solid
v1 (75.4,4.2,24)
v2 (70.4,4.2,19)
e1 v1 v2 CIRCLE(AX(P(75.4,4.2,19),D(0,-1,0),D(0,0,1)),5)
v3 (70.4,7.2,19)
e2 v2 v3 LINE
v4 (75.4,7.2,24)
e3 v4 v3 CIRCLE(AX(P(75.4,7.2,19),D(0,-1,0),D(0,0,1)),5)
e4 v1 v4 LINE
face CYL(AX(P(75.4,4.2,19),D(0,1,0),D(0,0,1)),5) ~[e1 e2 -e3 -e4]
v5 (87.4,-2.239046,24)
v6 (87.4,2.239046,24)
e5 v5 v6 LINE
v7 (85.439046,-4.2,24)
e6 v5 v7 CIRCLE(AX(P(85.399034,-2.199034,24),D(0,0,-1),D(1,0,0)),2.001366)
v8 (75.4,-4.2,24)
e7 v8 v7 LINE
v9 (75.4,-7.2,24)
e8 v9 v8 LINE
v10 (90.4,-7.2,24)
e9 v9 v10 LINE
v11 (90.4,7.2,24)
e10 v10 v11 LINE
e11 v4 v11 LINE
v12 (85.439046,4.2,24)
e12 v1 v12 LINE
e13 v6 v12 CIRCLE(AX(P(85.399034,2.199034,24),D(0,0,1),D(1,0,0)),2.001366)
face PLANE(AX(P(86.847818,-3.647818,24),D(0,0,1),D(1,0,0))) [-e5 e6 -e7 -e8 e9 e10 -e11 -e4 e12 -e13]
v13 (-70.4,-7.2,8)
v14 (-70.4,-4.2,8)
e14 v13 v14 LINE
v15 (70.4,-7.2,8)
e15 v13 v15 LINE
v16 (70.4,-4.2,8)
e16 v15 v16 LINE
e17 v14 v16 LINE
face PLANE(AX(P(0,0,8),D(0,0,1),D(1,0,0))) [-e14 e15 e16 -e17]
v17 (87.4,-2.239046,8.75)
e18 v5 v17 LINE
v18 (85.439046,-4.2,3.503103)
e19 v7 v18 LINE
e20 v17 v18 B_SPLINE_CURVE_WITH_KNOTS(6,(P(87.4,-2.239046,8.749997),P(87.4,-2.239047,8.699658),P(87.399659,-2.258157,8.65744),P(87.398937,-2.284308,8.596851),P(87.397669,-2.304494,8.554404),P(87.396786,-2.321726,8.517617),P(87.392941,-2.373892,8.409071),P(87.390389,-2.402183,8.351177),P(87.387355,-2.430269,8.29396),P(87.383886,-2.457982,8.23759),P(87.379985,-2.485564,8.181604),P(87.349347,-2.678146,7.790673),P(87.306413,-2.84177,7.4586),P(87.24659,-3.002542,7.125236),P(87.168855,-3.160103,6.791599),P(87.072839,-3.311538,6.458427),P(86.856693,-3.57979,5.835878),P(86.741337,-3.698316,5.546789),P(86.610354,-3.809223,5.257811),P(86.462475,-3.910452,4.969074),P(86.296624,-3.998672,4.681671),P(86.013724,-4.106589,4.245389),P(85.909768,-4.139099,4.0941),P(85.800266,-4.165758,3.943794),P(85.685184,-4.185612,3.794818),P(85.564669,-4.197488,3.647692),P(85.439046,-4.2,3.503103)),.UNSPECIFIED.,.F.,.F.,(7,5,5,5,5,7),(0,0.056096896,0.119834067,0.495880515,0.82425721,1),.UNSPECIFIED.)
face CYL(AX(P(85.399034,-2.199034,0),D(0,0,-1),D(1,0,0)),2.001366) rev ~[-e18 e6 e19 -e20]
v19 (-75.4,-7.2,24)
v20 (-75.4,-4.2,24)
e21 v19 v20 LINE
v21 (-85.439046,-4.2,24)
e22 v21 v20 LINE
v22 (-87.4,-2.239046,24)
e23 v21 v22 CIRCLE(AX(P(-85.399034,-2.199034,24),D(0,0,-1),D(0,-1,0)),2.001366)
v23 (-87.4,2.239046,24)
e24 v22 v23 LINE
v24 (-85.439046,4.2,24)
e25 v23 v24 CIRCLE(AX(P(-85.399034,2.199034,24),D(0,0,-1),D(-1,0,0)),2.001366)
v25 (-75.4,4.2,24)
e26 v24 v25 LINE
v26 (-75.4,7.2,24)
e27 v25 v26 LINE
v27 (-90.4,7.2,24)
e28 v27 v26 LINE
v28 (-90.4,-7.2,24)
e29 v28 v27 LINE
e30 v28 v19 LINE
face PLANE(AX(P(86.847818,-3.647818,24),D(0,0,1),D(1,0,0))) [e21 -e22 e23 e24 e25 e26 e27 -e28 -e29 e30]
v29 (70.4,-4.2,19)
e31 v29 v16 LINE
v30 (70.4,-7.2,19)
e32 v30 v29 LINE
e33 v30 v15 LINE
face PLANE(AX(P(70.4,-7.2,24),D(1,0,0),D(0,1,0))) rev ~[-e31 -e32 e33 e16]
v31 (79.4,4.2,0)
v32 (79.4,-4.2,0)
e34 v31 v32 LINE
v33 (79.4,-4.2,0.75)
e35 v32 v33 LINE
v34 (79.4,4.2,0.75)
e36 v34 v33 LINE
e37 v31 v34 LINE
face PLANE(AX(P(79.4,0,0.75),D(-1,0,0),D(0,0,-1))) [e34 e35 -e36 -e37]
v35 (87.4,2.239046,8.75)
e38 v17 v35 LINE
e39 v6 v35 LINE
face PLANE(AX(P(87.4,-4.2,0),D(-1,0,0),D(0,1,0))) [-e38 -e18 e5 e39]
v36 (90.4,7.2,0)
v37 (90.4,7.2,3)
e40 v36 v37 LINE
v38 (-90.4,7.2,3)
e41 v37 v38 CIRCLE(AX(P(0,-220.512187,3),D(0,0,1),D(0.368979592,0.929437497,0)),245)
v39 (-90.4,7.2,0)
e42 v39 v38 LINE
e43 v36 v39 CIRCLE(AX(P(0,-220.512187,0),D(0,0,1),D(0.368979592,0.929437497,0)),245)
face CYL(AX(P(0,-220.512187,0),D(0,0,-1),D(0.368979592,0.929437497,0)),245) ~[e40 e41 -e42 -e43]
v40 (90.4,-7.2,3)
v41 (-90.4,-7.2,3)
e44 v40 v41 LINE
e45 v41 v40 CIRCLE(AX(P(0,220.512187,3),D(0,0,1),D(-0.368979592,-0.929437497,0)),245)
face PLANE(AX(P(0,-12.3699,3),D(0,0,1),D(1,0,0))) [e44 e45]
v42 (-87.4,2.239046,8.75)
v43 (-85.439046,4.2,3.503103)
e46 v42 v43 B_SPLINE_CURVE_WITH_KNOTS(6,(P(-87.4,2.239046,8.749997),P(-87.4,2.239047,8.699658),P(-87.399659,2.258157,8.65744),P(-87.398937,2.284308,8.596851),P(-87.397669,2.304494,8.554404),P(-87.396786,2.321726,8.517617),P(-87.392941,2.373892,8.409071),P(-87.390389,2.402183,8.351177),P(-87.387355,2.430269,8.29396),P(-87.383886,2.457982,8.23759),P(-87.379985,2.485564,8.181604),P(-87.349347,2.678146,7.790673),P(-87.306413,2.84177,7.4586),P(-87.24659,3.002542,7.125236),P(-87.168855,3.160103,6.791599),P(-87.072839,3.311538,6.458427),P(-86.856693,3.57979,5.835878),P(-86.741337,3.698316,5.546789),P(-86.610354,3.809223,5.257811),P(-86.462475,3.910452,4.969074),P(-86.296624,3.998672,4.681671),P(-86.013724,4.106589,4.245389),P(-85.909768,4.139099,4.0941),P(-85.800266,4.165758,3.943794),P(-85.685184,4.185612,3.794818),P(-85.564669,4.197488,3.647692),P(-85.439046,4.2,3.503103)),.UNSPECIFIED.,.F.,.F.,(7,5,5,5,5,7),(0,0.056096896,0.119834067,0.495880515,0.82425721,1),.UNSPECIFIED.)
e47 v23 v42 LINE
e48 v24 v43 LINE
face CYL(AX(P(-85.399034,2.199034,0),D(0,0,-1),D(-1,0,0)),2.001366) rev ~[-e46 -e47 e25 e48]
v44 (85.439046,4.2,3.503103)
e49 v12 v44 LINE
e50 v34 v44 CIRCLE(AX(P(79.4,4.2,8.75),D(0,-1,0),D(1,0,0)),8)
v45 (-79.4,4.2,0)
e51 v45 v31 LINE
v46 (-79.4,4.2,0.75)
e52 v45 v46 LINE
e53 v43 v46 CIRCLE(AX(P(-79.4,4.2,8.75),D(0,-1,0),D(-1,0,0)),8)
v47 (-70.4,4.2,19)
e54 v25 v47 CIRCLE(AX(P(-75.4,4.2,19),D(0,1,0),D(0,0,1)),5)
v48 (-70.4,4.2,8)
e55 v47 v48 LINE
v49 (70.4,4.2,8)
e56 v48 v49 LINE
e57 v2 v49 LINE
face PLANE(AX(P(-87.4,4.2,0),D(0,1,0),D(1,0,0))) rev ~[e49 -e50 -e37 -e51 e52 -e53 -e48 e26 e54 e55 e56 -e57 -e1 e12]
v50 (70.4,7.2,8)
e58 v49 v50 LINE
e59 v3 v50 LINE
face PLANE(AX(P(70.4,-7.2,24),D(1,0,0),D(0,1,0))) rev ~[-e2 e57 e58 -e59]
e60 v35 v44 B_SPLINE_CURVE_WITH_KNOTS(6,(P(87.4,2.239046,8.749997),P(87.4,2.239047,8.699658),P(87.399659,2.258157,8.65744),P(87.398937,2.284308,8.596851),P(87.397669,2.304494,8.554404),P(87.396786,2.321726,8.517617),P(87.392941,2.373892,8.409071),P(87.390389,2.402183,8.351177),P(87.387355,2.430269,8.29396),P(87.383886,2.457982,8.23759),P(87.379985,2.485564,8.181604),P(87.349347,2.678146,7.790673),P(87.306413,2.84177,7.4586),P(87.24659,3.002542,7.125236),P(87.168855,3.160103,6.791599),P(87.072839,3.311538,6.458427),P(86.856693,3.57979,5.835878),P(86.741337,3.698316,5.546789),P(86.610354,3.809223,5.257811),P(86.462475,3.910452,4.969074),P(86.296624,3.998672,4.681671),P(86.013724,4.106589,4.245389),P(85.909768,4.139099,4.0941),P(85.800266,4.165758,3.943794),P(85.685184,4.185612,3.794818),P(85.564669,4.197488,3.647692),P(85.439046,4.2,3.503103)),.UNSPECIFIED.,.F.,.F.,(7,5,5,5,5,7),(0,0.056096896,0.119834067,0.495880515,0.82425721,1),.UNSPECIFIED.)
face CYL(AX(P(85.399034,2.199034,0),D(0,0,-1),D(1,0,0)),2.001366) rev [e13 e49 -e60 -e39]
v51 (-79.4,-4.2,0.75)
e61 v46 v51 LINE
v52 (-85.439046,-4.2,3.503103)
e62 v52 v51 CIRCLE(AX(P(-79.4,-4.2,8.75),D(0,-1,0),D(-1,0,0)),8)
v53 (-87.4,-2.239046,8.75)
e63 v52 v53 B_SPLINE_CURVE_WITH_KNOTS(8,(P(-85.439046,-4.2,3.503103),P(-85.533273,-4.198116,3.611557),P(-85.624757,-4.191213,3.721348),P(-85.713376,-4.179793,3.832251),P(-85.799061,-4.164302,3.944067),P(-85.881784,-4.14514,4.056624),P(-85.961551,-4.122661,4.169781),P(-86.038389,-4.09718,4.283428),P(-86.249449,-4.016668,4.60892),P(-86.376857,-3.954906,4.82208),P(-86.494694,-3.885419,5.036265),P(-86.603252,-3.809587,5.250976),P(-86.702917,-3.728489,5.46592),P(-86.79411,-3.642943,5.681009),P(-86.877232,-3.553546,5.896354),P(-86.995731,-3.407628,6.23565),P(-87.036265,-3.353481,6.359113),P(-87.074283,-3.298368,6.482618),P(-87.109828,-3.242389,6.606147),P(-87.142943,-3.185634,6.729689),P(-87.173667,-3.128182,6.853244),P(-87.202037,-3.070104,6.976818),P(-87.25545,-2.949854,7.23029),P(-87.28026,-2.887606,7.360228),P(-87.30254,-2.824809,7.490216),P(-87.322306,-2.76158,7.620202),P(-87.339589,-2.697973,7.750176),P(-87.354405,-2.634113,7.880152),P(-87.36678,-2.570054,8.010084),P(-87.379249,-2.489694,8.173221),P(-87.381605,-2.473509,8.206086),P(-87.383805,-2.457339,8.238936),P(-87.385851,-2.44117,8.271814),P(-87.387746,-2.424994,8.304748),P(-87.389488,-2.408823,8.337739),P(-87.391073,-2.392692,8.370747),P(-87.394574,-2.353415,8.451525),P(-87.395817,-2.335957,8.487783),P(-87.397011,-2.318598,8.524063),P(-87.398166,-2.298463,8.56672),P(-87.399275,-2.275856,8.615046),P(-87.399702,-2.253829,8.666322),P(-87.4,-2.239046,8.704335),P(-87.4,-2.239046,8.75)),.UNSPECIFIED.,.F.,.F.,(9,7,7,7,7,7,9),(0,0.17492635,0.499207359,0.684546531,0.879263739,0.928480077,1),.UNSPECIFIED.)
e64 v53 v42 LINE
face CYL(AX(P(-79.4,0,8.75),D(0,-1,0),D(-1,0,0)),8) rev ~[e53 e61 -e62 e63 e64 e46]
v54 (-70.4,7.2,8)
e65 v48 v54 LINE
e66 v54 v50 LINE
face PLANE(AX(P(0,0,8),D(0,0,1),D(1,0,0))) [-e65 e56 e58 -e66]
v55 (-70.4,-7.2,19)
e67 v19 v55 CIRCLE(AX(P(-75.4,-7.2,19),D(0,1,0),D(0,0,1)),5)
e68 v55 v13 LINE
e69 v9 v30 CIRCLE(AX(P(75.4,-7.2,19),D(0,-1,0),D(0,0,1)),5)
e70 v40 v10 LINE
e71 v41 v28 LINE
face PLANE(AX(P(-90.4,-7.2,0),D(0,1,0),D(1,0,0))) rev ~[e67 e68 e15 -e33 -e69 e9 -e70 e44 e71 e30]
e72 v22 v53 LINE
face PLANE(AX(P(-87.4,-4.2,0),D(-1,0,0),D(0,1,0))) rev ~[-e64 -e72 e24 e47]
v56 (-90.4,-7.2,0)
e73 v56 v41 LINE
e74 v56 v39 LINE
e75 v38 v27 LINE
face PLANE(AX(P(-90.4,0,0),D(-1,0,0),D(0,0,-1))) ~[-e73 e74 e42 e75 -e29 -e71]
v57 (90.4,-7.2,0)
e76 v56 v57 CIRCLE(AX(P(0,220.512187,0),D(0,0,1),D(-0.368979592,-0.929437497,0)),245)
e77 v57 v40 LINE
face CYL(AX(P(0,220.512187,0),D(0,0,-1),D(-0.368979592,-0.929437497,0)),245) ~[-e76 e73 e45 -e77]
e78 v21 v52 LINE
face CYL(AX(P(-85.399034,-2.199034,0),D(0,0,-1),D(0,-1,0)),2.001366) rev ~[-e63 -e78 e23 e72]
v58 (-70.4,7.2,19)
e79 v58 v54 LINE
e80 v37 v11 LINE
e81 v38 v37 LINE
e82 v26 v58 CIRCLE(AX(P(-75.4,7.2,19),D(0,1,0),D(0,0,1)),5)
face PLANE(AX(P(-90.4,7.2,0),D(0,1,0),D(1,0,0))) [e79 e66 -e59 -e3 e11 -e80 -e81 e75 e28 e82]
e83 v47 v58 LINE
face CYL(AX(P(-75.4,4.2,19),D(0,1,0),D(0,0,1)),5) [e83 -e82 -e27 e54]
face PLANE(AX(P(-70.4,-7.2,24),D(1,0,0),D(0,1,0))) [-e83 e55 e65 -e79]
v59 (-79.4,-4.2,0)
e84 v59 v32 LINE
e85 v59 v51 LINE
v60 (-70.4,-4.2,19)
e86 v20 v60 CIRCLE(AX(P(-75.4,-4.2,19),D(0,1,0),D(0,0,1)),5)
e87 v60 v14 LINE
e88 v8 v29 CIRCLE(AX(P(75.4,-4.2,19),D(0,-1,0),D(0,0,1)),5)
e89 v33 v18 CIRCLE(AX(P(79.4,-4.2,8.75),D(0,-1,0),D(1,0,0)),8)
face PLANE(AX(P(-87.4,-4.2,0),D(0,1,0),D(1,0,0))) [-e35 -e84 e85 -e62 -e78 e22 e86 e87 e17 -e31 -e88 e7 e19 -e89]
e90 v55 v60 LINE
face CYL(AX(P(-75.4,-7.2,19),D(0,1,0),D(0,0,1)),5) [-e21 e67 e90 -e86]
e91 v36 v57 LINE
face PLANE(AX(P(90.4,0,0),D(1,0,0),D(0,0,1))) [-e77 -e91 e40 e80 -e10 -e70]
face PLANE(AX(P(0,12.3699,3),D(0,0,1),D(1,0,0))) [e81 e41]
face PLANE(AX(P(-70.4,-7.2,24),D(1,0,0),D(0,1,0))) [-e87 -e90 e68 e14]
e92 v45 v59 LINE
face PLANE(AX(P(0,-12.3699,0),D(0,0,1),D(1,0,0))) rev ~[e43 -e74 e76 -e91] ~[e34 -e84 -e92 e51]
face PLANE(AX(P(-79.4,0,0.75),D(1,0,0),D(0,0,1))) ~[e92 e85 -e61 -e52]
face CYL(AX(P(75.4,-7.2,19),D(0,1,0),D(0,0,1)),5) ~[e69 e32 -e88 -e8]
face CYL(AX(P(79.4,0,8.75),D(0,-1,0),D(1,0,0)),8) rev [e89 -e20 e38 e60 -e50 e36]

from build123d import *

# Parameters (mm, degrees)
F1_W        = 180.8
F1_H        = 14.4
F1_W_2      = 174.8
F1_H_2      = 8.4
F2_DEPTH    = 24
F3_T1_DEPTH = 24
F5_DEPTH    = 4.35
F6_W        = 140.8
F6_H        = 14.4
F7_DEPTH    = 16
F8_R        = 5
F10_DEPTH   = 3


# Not quite as in the source:
# - a fillet or chamfer that OpenCascade refuses, or shapes differently, is made with other operations: its cross-section is extruded or revolved along the edge and cut away or added
# - a pattern or mirror of a feature is missing from the dataset's text; its kind, count and spacing are read off the source's solid


with BuildPart() as f2:
    # F1 (on Top) → F2 (new body)
    with BuildSketch(Plane.XY):
        Rectangle(F1_W, F1_H)
        Rectangle(F1_W_2, F1_H_2, mode=Mode.SUBTRACT)
    extrude(amount=F2_DEPTH)

    # F3: fillet of radius 2 on 4 edges, made by hand

    # F3_s2 → F3_t1 (join)
    with BuildSketch(Plane.XY):
        with BuildLine():
            ThreePointArc((87.4004, -2.1990343146), (86.8142135624, -3.6142135624), (85.3990343146, -4.2004))
            Line((85.3990343146, -4.2004), (85.3990343146, -4.4005365685))
            ThreePointArc((85.3990343146, -4.4005365685), (86.3995171573, -4.4001365685), (87.4, -4.4001365685))
            Line((87.4, -4.4001365685), (87.6001365685, -4.2))
            ThreePointArc((87.6001365685, -4.2), (87.6001365685, -3.1995171573), (87.6005365685, -2.1990343146))
            Line((87.6005365685, -2.1990343146), (87.4004, -2.1990343146))
        make_face()
        with BuildLine():
            ThreePointArc((87.4004, 2.1990343146), (86.8142135624, 3.6142135624), (85.3990343146, 4.2004))
            Line((85.3990343146, 4.2004), (85.3990343146, 4.4005365685))
            ThreePointArc((85.3990343146, 4.4005365685), (86.3995171573, 4.4001365685), (87.4, 4.4001365685))
            Line((87.4, 4.4001365685), (87.6001365685, 4.2))
            ThreePointArc((87.6001365685, 4.2), (87.6001365685, 3.1995171573), (87.6005365685, 2.1990343146))
            Line((87.6005365685, 2.1990343146), (87.4004, 2.1990343146))
        make_face()
        with BuildLine():
            ThreePointArc((-85.3990343146, -4.2004), (-86.8142135624, -3.6142135624), (-87.4004, -2.1990343146))
            Line((-87.4004, -2.1990343146), (-87.6005365685, -2.1990343146))
            ThreePointArc((-87.6005365685, -2.1990343146), (-87.6001365685, -3.1995171573), (-87.6001365685, -4.2))
            Line((-87.6001365685, -4.2), (-87.4, -4.4001365685))
            ThreePointArc((-87.4, -4.4001365685), (-86.3995171573, -4.4001365685), (-85.3990343146, -4.4005365685))
            Line((-85.3990343146, -4.4005365685), (-85.3990343146, -4.2004))
        make_face()
        with BuildLine():
            ThreePointArc((-87.4004, 2.1990343146), (-86.8142135624, 3.6142135624), (-85.3990343146, 4.2004))
            Line((-85.3990343146, 4.2004), (-85.3990343146, 4.4005365685))
            ThreePointArc((-85.3990343146, 4.4005365685), (-86.3995171573, 4.4001365685), (-87.4, 4.4001365685))
            Line((-87.4, 4.4001365685), (-87.6001365685, 4.2))
            ThreePointArc((-87.6001365685, 4.2), (-87.6001365685, 3.1995171573), (-87.6005365685, 2.1990343146))
            Line((-87.6005365685, 2.1990343146), (-87.4004, 2.1990343146))
        make_face()
    extrude(amount=F3_T1_DEPTH)

    # F4 (on Front) → F5 (join, symmetric)
    with BuildSketch(Plane.XZ):
        with BuildLine():
            ThreePointArc((87.4, 8.75), (85.0568542495, 3.0931457505), (79.4, 0.75))
            Line((79.4, 0.75), (79.4, 0))
            Line((79.4, 0), (90.4, 0))
            Line((90.4, 0), (90.4, 8.75))
            Line((90.4, 8.75), (87.4, 8.75))
        make_face()
    f5 = extrude(amount=F5_DEPTH, both=True)

    # F5_copies: F5 across plane
    add(f5.mirror(Plane(origin=(0, 0, 0), x_dir=(0, 0, -1), z_dir=(-1, 0, 0))))

    # F6 (on face) → F7 (cut)
    with BuildSketch(Plane.XY.offset(24)):
        Rectangle(F6_W, F6_H)
    extrude(amount=-F7_DEPTH, mode=Mode.SUBTRACT)

    # F8
    f8_edges = [f2.edges().sort_by_distance(p)[0] for p in [
        (-70.4, 5.7, 24),
        (-70.4, -5.7, 24),
        (70.4, 5.7, 24),
        (70.4, -5.7, 24),
    ]]
    fillet(f8_edges, radius=F8_R)

    # F9 (on Top) → F10 (join)
    with BuildSketch(Plane.XY):
        with BuildLine():
            Line((90.4, -7.2), (-90.4, -7.2))
            ThreePointArc((-90.4, -7.2), (0, -24.4878132379), (90.4, -7.2))
        make_face()
        with BuildLine():
            Line((-90.4, 7.2), (90.4, 7.2))
            ThreePointArc((90.4, 7.2), (0, 24.4878132379), (-90.4, 7.2))
        make_face()
    extrude(amount=F10_DEPTH)


solid = f2.part
